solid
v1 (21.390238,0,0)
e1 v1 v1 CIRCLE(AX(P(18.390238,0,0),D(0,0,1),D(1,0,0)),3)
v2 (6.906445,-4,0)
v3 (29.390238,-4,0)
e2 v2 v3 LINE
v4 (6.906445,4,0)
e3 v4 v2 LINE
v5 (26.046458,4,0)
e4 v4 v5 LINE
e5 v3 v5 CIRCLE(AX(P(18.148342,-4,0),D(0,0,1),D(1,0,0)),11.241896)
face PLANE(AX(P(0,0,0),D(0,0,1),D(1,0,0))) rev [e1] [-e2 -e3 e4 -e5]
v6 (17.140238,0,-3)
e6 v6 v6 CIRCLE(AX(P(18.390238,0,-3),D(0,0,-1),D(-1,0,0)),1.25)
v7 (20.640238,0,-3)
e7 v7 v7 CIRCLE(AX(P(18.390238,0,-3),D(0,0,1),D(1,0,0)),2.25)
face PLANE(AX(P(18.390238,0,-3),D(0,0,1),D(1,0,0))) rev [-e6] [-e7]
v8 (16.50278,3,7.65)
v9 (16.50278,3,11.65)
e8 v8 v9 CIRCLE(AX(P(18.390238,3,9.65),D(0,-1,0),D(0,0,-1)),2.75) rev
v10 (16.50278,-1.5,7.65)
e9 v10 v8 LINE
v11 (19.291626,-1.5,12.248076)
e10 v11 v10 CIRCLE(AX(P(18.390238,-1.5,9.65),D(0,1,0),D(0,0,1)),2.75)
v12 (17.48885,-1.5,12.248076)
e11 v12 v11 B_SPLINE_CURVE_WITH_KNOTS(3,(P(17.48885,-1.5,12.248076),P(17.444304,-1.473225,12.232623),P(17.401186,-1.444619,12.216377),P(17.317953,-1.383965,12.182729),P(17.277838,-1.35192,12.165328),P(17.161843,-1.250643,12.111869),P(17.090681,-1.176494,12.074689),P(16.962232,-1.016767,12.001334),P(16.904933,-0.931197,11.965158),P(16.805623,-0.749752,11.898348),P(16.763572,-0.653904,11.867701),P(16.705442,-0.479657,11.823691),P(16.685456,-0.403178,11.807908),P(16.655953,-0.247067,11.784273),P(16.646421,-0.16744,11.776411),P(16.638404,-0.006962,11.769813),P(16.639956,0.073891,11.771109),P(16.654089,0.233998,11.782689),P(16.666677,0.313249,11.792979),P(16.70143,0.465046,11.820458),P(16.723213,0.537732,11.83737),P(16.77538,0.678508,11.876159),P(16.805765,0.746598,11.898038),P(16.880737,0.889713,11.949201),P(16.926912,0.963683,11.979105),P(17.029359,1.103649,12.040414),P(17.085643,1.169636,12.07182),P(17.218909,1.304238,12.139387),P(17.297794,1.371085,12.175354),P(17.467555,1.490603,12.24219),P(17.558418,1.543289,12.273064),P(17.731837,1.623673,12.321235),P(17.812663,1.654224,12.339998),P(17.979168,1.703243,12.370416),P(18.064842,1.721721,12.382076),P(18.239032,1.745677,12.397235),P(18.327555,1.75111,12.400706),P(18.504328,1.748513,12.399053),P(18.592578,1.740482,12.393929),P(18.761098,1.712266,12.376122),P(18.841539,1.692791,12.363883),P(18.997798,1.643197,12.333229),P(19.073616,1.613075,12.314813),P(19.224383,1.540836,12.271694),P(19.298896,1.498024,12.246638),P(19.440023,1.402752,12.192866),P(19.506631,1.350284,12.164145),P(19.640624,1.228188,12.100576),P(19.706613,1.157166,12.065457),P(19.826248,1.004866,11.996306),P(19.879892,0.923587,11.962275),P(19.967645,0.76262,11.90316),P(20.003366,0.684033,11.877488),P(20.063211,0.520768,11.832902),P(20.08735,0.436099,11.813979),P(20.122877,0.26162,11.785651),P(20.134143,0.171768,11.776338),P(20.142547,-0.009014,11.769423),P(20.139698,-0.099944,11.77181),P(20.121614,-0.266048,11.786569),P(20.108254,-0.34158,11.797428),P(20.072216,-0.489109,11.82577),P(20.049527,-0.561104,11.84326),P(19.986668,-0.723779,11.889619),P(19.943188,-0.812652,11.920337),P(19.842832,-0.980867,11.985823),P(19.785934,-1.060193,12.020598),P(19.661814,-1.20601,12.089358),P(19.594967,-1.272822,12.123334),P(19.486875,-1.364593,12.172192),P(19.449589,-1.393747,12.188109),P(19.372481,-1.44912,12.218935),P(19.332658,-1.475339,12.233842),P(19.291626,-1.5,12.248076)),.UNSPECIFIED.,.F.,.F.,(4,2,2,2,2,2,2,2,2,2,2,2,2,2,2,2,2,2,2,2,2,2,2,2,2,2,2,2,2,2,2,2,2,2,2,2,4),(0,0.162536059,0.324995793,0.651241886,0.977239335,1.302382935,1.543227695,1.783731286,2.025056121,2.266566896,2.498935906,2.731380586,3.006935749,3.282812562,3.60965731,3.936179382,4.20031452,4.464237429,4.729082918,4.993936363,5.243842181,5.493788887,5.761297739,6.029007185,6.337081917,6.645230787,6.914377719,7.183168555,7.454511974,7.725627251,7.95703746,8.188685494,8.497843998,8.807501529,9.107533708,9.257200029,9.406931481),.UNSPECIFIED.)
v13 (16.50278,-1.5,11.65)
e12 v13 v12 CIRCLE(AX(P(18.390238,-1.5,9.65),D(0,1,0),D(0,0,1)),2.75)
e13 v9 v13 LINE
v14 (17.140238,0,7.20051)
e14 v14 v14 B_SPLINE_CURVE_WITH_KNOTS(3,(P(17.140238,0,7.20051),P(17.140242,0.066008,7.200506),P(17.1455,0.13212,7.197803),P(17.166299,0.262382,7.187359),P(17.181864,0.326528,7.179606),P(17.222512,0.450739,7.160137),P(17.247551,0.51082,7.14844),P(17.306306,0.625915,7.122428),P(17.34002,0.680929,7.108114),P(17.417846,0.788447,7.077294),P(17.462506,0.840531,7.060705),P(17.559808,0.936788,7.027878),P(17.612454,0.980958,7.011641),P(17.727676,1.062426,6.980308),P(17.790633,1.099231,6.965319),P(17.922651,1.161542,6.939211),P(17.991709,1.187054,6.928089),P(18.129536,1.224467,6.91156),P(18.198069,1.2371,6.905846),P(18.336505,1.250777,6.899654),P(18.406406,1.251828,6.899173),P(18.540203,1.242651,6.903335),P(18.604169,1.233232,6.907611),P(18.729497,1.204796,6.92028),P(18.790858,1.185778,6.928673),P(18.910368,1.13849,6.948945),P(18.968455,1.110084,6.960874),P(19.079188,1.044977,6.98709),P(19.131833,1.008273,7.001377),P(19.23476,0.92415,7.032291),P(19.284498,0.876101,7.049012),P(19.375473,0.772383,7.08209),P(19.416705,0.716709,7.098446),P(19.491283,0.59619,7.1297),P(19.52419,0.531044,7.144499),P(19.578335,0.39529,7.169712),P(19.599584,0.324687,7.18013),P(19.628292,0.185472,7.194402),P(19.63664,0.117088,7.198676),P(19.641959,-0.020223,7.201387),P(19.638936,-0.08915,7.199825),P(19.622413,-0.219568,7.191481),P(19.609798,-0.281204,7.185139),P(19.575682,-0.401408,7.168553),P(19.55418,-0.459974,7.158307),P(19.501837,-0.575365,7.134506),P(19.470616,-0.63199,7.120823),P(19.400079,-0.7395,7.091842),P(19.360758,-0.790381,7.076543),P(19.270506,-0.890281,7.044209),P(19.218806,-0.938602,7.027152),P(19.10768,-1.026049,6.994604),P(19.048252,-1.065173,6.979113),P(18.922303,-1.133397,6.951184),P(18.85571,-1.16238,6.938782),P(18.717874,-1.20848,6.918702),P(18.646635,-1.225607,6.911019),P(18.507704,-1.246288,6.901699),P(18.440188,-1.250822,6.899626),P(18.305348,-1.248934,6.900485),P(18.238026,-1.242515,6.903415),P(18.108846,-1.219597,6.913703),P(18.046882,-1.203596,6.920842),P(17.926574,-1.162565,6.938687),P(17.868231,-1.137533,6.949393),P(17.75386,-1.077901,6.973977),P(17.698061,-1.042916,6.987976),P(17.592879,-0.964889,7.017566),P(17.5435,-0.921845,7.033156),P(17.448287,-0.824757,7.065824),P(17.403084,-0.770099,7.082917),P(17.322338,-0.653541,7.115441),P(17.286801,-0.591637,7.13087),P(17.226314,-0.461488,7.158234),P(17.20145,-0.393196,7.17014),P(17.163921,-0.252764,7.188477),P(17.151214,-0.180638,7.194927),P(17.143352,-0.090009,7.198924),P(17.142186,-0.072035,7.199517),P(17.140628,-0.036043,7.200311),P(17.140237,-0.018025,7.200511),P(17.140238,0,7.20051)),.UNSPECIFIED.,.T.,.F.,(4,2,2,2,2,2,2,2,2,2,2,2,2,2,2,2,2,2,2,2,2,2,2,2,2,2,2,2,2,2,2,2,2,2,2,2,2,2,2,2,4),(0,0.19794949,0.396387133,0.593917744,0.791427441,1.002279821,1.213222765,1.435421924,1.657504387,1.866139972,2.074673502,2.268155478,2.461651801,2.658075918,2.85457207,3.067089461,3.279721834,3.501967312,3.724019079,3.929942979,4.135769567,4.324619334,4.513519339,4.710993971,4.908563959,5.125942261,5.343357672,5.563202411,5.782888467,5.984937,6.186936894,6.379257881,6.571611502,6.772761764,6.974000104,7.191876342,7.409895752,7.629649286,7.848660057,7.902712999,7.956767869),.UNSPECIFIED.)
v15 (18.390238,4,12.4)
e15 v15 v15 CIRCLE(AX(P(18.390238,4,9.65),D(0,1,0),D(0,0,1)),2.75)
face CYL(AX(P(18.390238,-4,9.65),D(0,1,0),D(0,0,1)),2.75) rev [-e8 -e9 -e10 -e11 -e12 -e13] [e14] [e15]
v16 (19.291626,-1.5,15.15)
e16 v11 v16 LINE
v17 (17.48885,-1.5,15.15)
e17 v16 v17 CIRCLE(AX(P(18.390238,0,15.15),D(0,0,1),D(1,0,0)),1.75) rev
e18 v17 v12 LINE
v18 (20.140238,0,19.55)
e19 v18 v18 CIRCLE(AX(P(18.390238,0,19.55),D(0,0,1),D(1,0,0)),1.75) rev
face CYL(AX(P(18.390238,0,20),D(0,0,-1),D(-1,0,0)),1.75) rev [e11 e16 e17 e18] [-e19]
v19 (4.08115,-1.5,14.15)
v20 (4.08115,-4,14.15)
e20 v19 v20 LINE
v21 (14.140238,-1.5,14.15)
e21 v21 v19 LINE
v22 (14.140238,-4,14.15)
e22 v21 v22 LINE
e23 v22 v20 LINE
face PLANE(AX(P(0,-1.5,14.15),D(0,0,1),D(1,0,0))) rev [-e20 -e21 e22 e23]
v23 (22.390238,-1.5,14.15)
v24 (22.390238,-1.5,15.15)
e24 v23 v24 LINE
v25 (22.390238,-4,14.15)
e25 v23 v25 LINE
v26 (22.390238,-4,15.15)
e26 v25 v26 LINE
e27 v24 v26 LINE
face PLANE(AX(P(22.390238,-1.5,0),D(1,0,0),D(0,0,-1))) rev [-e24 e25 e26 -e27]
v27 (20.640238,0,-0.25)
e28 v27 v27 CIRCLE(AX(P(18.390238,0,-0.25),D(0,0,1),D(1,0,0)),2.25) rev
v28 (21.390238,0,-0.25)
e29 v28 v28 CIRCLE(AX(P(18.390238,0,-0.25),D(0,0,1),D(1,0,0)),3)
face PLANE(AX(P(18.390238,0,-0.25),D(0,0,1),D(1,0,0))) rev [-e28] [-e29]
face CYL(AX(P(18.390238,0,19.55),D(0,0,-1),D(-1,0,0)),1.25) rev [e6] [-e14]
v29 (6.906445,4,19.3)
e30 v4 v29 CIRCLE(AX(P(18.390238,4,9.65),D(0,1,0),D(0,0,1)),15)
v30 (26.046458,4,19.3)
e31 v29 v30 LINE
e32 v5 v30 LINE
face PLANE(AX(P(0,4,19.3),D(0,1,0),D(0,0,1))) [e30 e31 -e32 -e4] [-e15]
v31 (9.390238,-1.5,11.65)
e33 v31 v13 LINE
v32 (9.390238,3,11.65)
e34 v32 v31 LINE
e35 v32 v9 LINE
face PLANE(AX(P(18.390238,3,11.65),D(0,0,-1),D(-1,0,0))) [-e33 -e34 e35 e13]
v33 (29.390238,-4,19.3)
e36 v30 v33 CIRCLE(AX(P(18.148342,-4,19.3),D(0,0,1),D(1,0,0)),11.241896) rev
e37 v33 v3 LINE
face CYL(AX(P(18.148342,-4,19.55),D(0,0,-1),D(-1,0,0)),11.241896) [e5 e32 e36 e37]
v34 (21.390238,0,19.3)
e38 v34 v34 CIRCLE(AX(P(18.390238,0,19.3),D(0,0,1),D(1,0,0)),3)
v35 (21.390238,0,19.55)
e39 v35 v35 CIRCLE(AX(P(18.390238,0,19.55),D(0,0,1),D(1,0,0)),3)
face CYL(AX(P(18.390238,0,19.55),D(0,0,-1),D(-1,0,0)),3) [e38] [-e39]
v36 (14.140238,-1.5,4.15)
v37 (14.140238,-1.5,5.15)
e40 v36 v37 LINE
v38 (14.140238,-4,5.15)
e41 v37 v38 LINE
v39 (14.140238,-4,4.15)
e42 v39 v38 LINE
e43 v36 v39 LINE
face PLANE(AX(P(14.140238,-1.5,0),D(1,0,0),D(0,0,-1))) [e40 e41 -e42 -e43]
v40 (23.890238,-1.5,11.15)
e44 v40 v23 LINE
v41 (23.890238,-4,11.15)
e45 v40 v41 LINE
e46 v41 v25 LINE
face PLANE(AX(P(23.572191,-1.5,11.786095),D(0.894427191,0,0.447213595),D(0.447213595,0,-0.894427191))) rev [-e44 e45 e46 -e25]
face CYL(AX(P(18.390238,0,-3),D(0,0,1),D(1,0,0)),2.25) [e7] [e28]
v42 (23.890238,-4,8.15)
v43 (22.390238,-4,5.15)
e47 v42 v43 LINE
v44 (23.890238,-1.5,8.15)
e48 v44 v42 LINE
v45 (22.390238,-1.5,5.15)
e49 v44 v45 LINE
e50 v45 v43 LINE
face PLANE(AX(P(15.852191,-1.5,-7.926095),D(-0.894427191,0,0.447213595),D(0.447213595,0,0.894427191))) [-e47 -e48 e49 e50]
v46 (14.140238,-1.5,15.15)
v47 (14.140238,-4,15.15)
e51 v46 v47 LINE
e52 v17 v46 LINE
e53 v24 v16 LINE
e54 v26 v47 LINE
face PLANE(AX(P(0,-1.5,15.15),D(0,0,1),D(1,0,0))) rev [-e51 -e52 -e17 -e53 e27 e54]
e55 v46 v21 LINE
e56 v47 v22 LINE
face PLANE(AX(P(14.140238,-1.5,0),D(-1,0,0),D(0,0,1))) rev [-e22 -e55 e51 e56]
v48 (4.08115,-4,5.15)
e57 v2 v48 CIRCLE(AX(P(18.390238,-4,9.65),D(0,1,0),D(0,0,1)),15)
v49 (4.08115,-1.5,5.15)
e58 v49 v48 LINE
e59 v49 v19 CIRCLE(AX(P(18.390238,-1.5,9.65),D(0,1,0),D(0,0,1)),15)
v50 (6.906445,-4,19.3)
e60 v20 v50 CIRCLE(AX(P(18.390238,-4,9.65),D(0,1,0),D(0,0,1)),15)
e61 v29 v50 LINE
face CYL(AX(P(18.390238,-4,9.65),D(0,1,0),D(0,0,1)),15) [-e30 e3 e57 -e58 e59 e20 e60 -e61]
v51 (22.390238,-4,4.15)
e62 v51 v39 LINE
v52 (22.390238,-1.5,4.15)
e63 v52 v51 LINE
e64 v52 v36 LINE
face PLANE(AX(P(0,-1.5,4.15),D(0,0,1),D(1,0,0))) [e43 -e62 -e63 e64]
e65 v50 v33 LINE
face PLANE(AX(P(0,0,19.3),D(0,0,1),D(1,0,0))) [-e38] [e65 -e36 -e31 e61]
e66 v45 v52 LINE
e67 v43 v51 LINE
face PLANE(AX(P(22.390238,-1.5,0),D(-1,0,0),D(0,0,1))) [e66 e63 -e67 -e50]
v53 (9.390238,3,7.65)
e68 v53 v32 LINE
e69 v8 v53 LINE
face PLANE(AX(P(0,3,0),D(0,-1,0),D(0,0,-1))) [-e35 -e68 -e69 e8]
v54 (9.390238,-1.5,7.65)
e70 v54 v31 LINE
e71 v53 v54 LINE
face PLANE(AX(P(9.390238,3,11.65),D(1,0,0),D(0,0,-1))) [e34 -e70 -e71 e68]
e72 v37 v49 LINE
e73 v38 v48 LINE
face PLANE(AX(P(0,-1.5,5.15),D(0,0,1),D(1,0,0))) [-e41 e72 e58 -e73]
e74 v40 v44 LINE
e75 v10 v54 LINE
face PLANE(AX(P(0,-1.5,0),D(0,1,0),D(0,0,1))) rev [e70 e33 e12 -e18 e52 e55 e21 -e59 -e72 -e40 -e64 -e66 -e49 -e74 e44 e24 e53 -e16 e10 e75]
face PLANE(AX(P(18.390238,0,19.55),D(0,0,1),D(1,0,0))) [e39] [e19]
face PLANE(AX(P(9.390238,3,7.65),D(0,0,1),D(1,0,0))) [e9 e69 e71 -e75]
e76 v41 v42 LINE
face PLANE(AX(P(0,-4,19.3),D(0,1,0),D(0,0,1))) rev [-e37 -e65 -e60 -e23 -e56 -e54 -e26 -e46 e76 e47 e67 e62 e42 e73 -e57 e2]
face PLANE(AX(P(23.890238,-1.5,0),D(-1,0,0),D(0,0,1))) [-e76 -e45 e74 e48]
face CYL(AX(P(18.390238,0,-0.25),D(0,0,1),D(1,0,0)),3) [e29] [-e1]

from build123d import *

# Parameters (mm, degrees)
BOSS_EXTRUDE1_DEPTH        = 19.3
POT_START                  = -4
POT_INSERT_DEPTH           = 2.5
POT_START_2                = 4
SKETCH6_R                  = 2.75
POT_HOLE_DEPTH             = 40.387513448
SKETCH8_R                  = 2.25
BOSS_EXTRUDE2_DEPTH        = 3
BOSS_EXTRUDE4_START        = 19.3
SKETCH18_R                 = 3
BOSS_EXTRUDE4_DEPTH        = 0.25
BOSS_EXTRUDE3_START        = -0.25
SKETCH17_R                 = 3
BOSS_EXTRUDE3_DEPTH        = 0.25
ABDUCTION_START            = 4
ABDUCTION_CURVE_DEPTH      = 40.524478998
ABDUCTION_START_2          = 11
SKETCH13_R                 = 1.75
ABDUCTION_CABLE_HOLE_DEPTH = 9
FLEX_EXTEND_CURVE_DEPTH    = 36.524479064
CUT_EXTRUDE1_START         = -1.5
SKETCH15_W                 = 9
SKETCH15_H                 = 4
CUT_EXTRUDE1_DEPTH         = 4.5
SKETCH16_R                 = 1.25
CUT_EXTRUDE2_DEPTH         = 38.259745213


with BuildPart() as part:
    # Sketch1 → Boss-Extrude1 (new body)
    with BuildSketch(Plane.XY):
        Polygon((1.390238312, 4), (1.390238312, -4), (18.390238312, -4), (29.390238312, -4), (29.390238312, 4), align=None)
    extrude(amount=BOSS_EXTRUDE1_DEPTH)

    # Sketch5 → Pot Insert (cut)
    with BuildSketch(Plane(origin=(0, 0, 0), x_dir=(1, 0, 0), z_dir=(0, 1, 0)).offset(POT_START)):
        Polygon((23.890238312, -11.15), (23.890238312, -8.15), (22.390238312, -5.15), (22.390238312, -4.15), (18.390238312, -4.15), (14.140238312, -4.15), (14.140238312, -5.15), (8.890238312, -5.15), (1.390238312, -5.15), (1.390238312, -9.15), (1.390238312, -14.15), (8.890238312, -14.15), (14.140238312, -14.15), (14.140238312, -15.15), (18.390238312, -15.15), (22.390238312, -15.15), (22.390238312, -14.15), align=None)
    extrude(amount=POT_INSERT_DEPTH, mode=Mode.SUBTRACT)

    # Sketch6 → Pot Hole (cut, through all)
    with BuildSketch(Plane(origin=(0, 0, 0), x_dir=(1, 0, 0), z_dir=(0, 1, 0)).offset(POT_START_2)):
        with Locations((18.390238312, -9.65)):
            Circle(SKETCH6_R)
    extrude(amount=-POT_HOLE_DEPTH, mode=Mode.SUBTRACT)

    # Sketch8 → Boss-Extrude2 (add)
    with BuildSketch(Plane.XY):
        with Locations((18.390238312, 0)):
            Circle(SKETCH8_R)
    extrude(amount=-BOSS_EXTRUDE2_DEPTH)

    # Sketch18 → Boss-Extrude4 (add)
    with BuildSketch(Plane.XY.offset(BOSS_EXTRUDE4_START)):
        with Locations((18.390238312, 0)):
            Circle(SKETCH18_R)
    extrude(amount=BOSS_EXTRUDE4_DEPTH)

    # Sketch17 → Boss-Extrude3 (add)
    with BuildSketch(Plane.XY.offset(BOSS_EXTRUDE3_START)):
        with Locations((18.390238312, 0)):
            Circle(SKETCH17_R)
    extrude(amount=BOSS_EXTRUDE3_DEPTH)

    # Sketch7 → Abduction Curve (cut, through all)
    with BuildSketch(Plane(origin=(0, 0, 0), x_dir=(1, 0, 0), z_dir=(0, 1, 0)).offset(ABDUCTION_START)):
        with BuildLine():
            Line((1.390238312, -24.65), (18.390238312, -24.65))
            ThreePointArc((18.390238312, -24.65), (3.390238312, -9.65), (18.390238312, 5.35))
            Line((18.390238312, 5.35), (1.390238312, 5.35))
            Line((1.390238312, 5.35), (1.390238312, -24.65))
        make_face()
    extrude(amount=-ABDUCTION_CURVE_DEPTH, mode=Mode.SUBTRACT)

    # Sketch13 → Abduction Cable Hole (cut)
    with BuildSketch(Plane.XY.offset(ABDUCTION_START_2)):
        with Locations((18.390238312, 0)):
            Circle(SKETCH13_R)
    extrude(amount=ABDUCTION_CABLE_HOLE_DEPTH, mode=Mode.SUBTRACT)

    # Sketch14 → Flex-Extend Curve (cut, through all)
    with BuildSketch(Plane.XY):
        with BuildLine():
            Line((29.390238312, 7.241896464), (18.148341849, 7.241896464))
            ThreePointArc((18.148341849, 7.241896464), (26.097563072, 3.949221223), (29.390238312, -4))
            Line((29.390238312, -4), (29.390238312, 7.241896464))
        make_face()
    extrude(amount=FLEX_EXTEND_CURVE_DEPTH, mode=Mode.SUBTRACT)

    # Sketch15 → Cut-Extrude1 (cut)
    with BuildSketch(Plane(origin=(0, 0, 0), x_dir=(1, 0, 0), z_dir=(0, 1, 0)).offset(CUT_EXTRUDE1_START)):
        with Locations((13.890238312, -9.65)):
            Rectangle(SKETCH15_W, SKETCH15_H)
    extrude(amount=CUT_EXTRUDE1_DEPTH, mode=Mode.SUBTRACT)

    # Sketch16 → Cut-Extrude2 (cut, through all)
    with BuildSketch(Plane(origin=(0, 0, -3), x_dir=(-1, 0, 0), z_dir=(0, 0, -1))):
        with Locations((-18.390238312, 0)):
            Circle(SKETCH16_R)
    extrude(amount=-CUT_EXTRUDE2_DEPTH, mode=Mode.SUBTRACT)


solid = part.part
